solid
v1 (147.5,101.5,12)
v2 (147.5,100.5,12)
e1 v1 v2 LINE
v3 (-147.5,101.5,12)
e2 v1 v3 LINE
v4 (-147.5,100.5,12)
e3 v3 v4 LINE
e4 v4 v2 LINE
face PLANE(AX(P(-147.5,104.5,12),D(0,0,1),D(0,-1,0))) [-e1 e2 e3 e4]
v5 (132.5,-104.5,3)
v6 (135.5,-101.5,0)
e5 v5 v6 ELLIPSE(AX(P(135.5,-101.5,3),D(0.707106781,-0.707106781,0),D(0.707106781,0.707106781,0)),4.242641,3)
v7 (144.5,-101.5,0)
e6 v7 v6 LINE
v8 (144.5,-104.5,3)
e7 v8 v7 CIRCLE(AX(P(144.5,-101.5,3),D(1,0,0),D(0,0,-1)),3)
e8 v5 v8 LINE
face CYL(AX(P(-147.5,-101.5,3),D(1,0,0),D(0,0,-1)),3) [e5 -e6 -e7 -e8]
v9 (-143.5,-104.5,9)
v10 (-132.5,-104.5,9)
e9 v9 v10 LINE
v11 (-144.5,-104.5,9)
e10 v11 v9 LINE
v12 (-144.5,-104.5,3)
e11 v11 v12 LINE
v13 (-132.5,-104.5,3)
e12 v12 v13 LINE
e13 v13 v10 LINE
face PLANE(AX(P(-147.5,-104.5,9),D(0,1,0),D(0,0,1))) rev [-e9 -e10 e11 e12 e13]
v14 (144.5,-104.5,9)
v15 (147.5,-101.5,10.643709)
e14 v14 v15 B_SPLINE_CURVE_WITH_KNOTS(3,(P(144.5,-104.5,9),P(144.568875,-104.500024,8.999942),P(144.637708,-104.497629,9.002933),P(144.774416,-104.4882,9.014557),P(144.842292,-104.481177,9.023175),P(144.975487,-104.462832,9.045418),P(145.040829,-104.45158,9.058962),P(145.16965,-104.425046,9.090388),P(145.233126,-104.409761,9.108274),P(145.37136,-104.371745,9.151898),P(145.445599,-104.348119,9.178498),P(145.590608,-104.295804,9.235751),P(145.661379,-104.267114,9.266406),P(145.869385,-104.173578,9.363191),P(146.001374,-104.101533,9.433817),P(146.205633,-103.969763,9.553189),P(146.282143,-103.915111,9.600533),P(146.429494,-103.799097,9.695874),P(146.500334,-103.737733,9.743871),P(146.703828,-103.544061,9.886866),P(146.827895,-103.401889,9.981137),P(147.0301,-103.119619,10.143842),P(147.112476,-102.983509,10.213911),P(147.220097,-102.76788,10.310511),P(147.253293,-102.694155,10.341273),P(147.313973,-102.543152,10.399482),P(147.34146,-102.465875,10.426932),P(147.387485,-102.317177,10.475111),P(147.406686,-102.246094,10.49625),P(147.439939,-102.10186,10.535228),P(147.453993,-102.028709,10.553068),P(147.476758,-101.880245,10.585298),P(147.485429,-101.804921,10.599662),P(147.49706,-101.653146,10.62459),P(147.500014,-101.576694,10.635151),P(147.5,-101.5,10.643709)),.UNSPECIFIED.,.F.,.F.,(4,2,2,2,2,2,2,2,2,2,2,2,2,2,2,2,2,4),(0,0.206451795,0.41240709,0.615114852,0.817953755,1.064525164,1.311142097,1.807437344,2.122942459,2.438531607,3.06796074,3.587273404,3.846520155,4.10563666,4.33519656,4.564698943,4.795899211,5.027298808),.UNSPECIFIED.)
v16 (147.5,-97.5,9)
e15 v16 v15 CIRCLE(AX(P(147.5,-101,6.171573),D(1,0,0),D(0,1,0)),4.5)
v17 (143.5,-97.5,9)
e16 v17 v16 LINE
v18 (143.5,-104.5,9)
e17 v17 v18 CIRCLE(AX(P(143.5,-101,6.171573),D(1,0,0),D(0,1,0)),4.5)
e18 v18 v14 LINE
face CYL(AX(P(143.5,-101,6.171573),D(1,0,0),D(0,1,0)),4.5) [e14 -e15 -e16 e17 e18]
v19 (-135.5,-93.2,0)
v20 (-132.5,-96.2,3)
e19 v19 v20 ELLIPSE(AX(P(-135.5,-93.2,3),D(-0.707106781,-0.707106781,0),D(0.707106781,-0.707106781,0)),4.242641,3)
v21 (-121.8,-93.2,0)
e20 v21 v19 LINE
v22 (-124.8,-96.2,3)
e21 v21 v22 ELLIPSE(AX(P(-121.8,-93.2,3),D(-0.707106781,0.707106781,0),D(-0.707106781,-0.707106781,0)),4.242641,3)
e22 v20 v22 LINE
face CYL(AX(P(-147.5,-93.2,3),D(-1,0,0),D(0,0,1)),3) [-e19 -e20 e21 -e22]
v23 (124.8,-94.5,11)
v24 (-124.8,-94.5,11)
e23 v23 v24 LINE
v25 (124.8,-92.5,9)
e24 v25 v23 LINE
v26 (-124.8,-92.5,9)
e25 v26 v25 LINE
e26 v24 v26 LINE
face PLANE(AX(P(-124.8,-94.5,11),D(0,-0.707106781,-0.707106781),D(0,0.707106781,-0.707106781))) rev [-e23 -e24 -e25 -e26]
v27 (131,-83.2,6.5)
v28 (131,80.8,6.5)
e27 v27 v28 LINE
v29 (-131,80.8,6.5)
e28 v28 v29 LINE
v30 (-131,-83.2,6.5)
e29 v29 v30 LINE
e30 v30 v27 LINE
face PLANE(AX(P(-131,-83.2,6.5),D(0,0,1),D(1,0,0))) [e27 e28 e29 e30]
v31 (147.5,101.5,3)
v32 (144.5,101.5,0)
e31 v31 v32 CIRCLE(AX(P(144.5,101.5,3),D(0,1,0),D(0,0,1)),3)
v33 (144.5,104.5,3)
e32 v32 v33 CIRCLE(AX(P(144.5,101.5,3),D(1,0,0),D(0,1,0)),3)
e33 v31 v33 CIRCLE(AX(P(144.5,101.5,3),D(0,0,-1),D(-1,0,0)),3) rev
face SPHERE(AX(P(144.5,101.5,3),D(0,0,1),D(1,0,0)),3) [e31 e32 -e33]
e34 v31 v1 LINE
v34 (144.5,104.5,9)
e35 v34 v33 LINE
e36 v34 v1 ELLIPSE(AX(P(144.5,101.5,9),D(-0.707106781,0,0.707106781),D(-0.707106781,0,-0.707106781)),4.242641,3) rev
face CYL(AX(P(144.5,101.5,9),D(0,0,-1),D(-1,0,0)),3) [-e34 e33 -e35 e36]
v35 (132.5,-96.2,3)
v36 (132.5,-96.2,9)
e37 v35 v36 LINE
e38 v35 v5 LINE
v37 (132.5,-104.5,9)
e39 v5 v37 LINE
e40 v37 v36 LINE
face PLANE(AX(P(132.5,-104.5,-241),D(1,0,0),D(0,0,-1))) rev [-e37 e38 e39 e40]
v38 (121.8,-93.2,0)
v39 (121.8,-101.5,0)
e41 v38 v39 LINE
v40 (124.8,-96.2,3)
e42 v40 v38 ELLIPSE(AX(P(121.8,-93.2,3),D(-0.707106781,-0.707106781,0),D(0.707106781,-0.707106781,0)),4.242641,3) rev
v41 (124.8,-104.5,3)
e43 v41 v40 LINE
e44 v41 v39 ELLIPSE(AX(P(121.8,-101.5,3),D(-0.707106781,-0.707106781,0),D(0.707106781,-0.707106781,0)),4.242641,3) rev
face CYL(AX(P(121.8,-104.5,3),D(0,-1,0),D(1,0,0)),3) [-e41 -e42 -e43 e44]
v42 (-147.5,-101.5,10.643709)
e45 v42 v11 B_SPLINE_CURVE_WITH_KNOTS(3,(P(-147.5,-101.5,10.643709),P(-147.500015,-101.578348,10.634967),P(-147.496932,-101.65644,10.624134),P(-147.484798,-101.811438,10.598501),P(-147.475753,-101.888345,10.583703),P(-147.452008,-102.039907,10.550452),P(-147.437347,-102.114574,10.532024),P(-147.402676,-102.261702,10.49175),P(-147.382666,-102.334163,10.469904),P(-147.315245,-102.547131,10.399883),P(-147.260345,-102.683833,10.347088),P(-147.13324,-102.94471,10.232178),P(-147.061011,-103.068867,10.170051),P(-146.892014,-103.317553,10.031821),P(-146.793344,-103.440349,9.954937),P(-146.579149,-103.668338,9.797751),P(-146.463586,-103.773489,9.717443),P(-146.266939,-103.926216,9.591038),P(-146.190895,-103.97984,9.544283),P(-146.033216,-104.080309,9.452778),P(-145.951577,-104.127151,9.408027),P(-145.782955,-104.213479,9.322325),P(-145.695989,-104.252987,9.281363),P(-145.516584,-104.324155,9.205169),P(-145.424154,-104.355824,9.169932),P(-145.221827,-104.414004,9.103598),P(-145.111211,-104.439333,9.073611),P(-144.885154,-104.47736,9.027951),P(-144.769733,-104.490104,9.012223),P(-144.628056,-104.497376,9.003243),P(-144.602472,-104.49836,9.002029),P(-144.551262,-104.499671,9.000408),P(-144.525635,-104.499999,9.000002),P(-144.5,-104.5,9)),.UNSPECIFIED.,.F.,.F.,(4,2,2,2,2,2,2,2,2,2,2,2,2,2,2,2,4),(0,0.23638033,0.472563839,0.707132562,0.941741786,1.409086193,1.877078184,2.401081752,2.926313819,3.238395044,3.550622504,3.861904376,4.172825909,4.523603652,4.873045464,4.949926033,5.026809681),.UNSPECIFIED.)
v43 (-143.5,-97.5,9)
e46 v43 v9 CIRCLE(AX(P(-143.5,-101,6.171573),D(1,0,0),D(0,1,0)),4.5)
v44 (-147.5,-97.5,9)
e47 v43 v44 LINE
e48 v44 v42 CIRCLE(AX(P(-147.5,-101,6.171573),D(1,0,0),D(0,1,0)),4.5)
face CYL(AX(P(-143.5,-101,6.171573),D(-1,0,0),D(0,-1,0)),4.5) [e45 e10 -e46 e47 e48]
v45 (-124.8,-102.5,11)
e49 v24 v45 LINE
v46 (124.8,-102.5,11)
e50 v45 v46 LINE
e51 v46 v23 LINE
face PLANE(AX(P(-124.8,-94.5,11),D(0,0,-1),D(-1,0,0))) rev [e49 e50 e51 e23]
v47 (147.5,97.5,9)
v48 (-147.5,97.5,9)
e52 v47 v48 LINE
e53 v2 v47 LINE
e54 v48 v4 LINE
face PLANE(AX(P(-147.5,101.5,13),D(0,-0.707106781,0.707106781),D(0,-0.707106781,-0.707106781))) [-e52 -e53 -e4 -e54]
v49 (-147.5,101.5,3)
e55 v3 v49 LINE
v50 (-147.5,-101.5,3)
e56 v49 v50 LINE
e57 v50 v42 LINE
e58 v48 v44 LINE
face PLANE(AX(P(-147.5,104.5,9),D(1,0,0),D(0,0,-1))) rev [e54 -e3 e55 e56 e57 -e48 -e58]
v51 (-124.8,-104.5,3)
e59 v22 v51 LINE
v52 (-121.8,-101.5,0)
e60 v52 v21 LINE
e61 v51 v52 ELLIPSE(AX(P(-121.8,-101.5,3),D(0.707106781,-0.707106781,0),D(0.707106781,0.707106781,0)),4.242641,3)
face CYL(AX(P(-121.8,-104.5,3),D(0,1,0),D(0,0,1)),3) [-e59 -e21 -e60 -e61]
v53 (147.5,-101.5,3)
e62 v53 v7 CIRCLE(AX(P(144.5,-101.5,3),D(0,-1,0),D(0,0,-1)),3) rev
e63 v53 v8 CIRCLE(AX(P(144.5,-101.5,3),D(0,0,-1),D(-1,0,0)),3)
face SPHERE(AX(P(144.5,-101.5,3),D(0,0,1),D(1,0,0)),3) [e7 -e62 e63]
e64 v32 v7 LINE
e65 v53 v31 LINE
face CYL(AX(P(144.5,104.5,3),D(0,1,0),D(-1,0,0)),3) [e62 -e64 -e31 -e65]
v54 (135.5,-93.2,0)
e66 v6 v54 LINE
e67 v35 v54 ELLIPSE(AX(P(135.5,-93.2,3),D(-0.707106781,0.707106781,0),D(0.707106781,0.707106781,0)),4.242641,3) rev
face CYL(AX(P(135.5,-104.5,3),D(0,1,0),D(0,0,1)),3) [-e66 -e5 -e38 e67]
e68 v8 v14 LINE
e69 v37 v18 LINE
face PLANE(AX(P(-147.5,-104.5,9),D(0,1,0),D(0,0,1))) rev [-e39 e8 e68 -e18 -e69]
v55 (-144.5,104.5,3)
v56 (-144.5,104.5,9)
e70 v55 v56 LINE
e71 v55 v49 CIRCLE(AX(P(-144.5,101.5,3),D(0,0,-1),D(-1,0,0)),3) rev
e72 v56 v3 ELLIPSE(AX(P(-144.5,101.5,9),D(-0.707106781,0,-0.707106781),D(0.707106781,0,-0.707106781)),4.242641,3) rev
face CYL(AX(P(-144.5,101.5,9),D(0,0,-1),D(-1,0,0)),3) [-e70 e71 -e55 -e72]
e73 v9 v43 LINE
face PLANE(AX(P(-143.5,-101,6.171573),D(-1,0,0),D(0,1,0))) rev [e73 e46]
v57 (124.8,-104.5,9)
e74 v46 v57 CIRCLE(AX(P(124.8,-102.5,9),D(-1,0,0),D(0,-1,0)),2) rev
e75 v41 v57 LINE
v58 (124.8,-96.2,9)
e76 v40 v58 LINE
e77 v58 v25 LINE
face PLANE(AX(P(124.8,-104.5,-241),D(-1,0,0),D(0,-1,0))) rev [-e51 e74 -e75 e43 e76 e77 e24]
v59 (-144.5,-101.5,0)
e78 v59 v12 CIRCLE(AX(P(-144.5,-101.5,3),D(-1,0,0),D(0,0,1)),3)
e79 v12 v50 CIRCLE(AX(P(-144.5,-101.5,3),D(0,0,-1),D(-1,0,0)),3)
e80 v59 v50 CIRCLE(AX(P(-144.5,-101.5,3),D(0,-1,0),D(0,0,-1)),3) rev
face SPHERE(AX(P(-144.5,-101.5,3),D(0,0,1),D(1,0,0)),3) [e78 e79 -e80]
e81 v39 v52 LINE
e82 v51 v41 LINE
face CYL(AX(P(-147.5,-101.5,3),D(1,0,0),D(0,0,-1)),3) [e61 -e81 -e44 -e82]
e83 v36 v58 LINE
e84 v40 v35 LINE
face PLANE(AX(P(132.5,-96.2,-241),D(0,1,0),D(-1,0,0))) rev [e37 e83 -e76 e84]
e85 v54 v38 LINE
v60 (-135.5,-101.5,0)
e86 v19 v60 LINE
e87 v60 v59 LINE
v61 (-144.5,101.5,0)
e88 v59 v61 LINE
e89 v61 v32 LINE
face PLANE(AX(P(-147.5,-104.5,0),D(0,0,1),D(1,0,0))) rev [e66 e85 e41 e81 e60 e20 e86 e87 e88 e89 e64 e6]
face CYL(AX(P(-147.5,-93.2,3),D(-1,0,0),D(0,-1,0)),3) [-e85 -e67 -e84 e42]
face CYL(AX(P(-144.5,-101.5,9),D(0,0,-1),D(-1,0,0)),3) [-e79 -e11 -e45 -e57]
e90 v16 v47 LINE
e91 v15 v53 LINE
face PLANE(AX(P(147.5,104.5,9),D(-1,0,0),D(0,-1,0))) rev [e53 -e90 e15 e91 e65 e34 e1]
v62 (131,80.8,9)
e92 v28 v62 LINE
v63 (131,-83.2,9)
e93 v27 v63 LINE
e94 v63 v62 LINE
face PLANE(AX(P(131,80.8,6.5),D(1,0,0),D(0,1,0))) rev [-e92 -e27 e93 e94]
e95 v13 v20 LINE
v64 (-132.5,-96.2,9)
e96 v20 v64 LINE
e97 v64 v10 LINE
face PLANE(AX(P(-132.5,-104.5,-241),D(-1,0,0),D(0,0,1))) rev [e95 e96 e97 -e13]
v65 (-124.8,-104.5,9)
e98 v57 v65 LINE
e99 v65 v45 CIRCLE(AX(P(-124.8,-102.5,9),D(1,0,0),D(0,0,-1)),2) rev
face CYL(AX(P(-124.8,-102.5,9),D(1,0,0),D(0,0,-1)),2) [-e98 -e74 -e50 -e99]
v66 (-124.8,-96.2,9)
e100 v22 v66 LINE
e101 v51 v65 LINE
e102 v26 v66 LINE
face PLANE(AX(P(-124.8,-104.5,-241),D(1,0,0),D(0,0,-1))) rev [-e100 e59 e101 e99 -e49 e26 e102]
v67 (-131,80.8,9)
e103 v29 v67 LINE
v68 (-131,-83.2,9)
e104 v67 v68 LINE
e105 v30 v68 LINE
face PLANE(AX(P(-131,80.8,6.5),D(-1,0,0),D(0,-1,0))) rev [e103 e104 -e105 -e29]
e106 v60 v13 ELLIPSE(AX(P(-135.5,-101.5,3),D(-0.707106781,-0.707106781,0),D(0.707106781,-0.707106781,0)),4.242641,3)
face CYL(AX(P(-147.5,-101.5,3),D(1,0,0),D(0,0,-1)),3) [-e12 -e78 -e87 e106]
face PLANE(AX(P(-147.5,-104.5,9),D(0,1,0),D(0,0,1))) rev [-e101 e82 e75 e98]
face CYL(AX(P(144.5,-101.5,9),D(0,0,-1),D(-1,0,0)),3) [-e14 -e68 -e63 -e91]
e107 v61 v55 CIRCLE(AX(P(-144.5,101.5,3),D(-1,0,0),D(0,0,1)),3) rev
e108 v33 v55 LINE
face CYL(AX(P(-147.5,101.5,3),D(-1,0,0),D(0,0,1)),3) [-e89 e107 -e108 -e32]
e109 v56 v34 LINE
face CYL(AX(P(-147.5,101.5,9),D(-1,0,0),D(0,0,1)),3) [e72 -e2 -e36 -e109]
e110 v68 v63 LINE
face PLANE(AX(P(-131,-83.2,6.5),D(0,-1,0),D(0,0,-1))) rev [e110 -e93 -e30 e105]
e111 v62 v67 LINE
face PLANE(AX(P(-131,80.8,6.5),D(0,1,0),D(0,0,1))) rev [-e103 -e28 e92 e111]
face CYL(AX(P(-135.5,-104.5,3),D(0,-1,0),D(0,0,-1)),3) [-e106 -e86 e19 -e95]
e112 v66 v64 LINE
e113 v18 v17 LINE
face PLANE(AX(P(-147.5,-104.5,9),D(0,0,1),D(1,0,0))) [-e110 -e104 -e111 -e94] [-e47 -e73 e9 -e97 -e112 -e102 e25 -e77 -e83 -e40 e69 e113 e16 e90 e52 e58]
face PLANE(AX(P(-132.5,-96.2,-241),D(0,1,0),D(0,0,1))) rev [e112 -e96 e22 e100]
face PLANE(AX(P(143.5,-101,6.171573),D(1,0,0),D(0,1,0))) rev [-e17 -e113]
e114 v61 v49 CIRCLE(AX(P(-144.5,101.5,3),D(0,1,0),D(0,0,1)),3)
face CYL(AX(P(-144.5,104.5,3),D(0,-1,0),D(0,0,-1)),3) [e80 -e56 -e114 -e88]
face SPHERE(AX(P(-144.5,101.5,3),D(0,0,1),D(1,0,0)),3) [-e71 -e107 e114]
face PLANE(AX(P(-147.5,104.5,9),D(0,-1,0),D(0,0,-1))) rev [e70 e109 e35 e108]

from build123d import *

# Parameters (mm, degrees)
SKETCH1_W           = 295
SKETCH1_H           = 209
BOSS_EXTRUDE1_DEPTH = 9
SKETCH2_W           = 262
SKETCH2_H           = 164
CUT_EXTRUDE1_DEPTH  = 2.5
SKETCH3_W           = 3
SKETCH3_H           = 3
BOSS_EXTRUDE2_DEPTH = 295
CHAMFER1_SIZE       = 4
SKETCH4_W           = 7.7
SKETCH4_H           = 8.3
CUT_EXTRUDE2_DEPTH  = 250
BOSS_EXTRUDE3_DEPTH = 4
SKETCH6_W           = 249.6
SKETCH6_H           = 10
BOSS_EXTRUDE4_DEPTH = 2
CHAMFER2_SIZE       = 2
FILLET1_R           = 2
FILLET2_R           = 3


# Some blends are built 0.0001 mm under size
with BuildPart() as part:
    # Sketch1 → Boss-Extrude1 (new body)
    with BuildSketch(Plane.XY):
        Rectangle(SKETCH1_W, SKETCH1_H)
    extrude(amount=BOSS_EXTRUDE1_DEPTH)

    # Sketch2 → Cut-Extrude1 (cut)
    with BuildSketch(Plane.XY.offset(9)):
        with Locations((0, -1.2)):
            Rectangle(SKETCH2_W, SKETCH2_H)
    extrude(amount=-CUT_EXTRUDE1_DEPTH, mode=Mode.SUBTRACT)

    # Sketch3 → Boss-Extrude2 (add)
    with BuildSketch(Plane(origin=(147.5, 0, 0), x_dir=(0, 0, -1), z_dir=(1, 0, 0))):
        with Locations((-10.5, 103)):
            Rectangle(SKETCH3_W, SKETCH3_H)
    extrude(amount=-BOSS_EXTRUDE2_DEPTH)

    # Chamfer1
    # the kernel refuses this chamfer: 4 mm, written as the material it adds along each edge
    with BuildSketch(Plane(origin=(147.5, 101.5, 9), x_dir=(0, -0.9996219169112968, -0.02749587661058651), z_dir=(-1, 0, 0))) as chamfer1_piece_1_section:
        Polygon((CHAMFER1_SIZE * 0.999621916911, CHAMFER1_SIZE * 0.0274958766106), (-CHAMFER1_SIZE * 0.0274958766106, CHAMFER1_SIZE * 0.999621916911), (0, 0), align=None)
    chamfer1_piece_1 = extrude(amount=295, mode=Mode.PRIVATE)
    chamfer1_piece_1 = split(chamfer1_piece_1, bisect_by=Plane(origin=(0, 100.092163559, 12), z_dir=(0, 0, -1)), keep=Keep.TOP, mode=Mode.PRIVATE)
    add(chamfer1_piece_1)

    # Sketch4 → Cut-Extrude2 (cut)
    with BuildSketch(Plane.XY.offset(9)):
        with Locations((-128.65, -100.35)):
            Rectangle(SKETCH4_W, SKETCH4_H)
        with Locations((128.65, -100.35)):
            Rectangle(SKETCH4_W, SKETCH4_H)
    extrude(amount=-CUT_EXTRUDE2_DEPTH, mode=Mode.SUBTRACT)

    # Sketch5 → Boss-Extrude3 (add)
    with BuildSketch(Plane(origin=(147.5, 0, 0), x_dir=(0, 0, -1), z_dir=(1, 0, 0))):
        with BuildLine():
            Line((-9, -104.5), (-9, -97.5))
            ThreePointArc((-9, -97.5), (-10.671572875, -101), (-9, -104.5))
        make_face()
    boss_extrude3 = extrude(amount=-BOSS_EXTRUDE3_DEPTH)

    # Mirror1: Boss-Extrude3 across plane
    add(boss_extrude3.mirror(Plane(origin=(0, 0, 0), x_dir=(0, 0, 1), z_dir=(1, 0, 0))))

    # Sketch6 → Boss-Extrude4 (add)
    with BuildSketch(Plane.XY.offset(9)):
        with Locations((0, -99.5)):
            Rectangle(SKETCH6_W, SKETCH6_H)
    extrude(amount=BOSS_EXTRUDE4_DEPTH)

    # Chamfer2
    chamfer2_edges = [part.edges().sort_by_distance(p)[0] for p in [
        (0, -94.5, 9),
    ]]
    chamfer(chamfer2_edges, length=CHAMFER2_SIZE - 0.0001)  # a hair under: the kernel refuses the full size

    # Fillet1
    fillet1_edges = [part.edges().sort_by_distance(p)[0] for p in [
        (0, -104.5, 11),
    ]]
    fillet(fillet1_edges, radius=FILLET1_R)

    # Fillet2
    fillet2_edges = [part.edges().sort_by_distance(p)[0] for p in [
        (0, 104.5, 12),
        (0, 104.5, 0),
        (0, -104.5, 0),
        (147.5, 0, 0),
        (-124.8, -100.35, 0),
        (-128.65, -96.2, 0),
        (-132.5, -100.35, 0),
        (-140, -104.5, 0),
        (-147.5, 0, 0),
        (140, -104.5, 0),
        (132.5, -100.35, 0),
        (128.65, -96.2, 0),
        (124.8, -100.35, 0),
        (-147.5, 104.5, 6),
        (147.5, 104.5, 6),
        (147.5, -104.5, 4.5),
        (-147.5, -104.5, 4.5),
    ]]
    fillet(fillet2_edges, radius=FILLET2_R)


solid = part.part
